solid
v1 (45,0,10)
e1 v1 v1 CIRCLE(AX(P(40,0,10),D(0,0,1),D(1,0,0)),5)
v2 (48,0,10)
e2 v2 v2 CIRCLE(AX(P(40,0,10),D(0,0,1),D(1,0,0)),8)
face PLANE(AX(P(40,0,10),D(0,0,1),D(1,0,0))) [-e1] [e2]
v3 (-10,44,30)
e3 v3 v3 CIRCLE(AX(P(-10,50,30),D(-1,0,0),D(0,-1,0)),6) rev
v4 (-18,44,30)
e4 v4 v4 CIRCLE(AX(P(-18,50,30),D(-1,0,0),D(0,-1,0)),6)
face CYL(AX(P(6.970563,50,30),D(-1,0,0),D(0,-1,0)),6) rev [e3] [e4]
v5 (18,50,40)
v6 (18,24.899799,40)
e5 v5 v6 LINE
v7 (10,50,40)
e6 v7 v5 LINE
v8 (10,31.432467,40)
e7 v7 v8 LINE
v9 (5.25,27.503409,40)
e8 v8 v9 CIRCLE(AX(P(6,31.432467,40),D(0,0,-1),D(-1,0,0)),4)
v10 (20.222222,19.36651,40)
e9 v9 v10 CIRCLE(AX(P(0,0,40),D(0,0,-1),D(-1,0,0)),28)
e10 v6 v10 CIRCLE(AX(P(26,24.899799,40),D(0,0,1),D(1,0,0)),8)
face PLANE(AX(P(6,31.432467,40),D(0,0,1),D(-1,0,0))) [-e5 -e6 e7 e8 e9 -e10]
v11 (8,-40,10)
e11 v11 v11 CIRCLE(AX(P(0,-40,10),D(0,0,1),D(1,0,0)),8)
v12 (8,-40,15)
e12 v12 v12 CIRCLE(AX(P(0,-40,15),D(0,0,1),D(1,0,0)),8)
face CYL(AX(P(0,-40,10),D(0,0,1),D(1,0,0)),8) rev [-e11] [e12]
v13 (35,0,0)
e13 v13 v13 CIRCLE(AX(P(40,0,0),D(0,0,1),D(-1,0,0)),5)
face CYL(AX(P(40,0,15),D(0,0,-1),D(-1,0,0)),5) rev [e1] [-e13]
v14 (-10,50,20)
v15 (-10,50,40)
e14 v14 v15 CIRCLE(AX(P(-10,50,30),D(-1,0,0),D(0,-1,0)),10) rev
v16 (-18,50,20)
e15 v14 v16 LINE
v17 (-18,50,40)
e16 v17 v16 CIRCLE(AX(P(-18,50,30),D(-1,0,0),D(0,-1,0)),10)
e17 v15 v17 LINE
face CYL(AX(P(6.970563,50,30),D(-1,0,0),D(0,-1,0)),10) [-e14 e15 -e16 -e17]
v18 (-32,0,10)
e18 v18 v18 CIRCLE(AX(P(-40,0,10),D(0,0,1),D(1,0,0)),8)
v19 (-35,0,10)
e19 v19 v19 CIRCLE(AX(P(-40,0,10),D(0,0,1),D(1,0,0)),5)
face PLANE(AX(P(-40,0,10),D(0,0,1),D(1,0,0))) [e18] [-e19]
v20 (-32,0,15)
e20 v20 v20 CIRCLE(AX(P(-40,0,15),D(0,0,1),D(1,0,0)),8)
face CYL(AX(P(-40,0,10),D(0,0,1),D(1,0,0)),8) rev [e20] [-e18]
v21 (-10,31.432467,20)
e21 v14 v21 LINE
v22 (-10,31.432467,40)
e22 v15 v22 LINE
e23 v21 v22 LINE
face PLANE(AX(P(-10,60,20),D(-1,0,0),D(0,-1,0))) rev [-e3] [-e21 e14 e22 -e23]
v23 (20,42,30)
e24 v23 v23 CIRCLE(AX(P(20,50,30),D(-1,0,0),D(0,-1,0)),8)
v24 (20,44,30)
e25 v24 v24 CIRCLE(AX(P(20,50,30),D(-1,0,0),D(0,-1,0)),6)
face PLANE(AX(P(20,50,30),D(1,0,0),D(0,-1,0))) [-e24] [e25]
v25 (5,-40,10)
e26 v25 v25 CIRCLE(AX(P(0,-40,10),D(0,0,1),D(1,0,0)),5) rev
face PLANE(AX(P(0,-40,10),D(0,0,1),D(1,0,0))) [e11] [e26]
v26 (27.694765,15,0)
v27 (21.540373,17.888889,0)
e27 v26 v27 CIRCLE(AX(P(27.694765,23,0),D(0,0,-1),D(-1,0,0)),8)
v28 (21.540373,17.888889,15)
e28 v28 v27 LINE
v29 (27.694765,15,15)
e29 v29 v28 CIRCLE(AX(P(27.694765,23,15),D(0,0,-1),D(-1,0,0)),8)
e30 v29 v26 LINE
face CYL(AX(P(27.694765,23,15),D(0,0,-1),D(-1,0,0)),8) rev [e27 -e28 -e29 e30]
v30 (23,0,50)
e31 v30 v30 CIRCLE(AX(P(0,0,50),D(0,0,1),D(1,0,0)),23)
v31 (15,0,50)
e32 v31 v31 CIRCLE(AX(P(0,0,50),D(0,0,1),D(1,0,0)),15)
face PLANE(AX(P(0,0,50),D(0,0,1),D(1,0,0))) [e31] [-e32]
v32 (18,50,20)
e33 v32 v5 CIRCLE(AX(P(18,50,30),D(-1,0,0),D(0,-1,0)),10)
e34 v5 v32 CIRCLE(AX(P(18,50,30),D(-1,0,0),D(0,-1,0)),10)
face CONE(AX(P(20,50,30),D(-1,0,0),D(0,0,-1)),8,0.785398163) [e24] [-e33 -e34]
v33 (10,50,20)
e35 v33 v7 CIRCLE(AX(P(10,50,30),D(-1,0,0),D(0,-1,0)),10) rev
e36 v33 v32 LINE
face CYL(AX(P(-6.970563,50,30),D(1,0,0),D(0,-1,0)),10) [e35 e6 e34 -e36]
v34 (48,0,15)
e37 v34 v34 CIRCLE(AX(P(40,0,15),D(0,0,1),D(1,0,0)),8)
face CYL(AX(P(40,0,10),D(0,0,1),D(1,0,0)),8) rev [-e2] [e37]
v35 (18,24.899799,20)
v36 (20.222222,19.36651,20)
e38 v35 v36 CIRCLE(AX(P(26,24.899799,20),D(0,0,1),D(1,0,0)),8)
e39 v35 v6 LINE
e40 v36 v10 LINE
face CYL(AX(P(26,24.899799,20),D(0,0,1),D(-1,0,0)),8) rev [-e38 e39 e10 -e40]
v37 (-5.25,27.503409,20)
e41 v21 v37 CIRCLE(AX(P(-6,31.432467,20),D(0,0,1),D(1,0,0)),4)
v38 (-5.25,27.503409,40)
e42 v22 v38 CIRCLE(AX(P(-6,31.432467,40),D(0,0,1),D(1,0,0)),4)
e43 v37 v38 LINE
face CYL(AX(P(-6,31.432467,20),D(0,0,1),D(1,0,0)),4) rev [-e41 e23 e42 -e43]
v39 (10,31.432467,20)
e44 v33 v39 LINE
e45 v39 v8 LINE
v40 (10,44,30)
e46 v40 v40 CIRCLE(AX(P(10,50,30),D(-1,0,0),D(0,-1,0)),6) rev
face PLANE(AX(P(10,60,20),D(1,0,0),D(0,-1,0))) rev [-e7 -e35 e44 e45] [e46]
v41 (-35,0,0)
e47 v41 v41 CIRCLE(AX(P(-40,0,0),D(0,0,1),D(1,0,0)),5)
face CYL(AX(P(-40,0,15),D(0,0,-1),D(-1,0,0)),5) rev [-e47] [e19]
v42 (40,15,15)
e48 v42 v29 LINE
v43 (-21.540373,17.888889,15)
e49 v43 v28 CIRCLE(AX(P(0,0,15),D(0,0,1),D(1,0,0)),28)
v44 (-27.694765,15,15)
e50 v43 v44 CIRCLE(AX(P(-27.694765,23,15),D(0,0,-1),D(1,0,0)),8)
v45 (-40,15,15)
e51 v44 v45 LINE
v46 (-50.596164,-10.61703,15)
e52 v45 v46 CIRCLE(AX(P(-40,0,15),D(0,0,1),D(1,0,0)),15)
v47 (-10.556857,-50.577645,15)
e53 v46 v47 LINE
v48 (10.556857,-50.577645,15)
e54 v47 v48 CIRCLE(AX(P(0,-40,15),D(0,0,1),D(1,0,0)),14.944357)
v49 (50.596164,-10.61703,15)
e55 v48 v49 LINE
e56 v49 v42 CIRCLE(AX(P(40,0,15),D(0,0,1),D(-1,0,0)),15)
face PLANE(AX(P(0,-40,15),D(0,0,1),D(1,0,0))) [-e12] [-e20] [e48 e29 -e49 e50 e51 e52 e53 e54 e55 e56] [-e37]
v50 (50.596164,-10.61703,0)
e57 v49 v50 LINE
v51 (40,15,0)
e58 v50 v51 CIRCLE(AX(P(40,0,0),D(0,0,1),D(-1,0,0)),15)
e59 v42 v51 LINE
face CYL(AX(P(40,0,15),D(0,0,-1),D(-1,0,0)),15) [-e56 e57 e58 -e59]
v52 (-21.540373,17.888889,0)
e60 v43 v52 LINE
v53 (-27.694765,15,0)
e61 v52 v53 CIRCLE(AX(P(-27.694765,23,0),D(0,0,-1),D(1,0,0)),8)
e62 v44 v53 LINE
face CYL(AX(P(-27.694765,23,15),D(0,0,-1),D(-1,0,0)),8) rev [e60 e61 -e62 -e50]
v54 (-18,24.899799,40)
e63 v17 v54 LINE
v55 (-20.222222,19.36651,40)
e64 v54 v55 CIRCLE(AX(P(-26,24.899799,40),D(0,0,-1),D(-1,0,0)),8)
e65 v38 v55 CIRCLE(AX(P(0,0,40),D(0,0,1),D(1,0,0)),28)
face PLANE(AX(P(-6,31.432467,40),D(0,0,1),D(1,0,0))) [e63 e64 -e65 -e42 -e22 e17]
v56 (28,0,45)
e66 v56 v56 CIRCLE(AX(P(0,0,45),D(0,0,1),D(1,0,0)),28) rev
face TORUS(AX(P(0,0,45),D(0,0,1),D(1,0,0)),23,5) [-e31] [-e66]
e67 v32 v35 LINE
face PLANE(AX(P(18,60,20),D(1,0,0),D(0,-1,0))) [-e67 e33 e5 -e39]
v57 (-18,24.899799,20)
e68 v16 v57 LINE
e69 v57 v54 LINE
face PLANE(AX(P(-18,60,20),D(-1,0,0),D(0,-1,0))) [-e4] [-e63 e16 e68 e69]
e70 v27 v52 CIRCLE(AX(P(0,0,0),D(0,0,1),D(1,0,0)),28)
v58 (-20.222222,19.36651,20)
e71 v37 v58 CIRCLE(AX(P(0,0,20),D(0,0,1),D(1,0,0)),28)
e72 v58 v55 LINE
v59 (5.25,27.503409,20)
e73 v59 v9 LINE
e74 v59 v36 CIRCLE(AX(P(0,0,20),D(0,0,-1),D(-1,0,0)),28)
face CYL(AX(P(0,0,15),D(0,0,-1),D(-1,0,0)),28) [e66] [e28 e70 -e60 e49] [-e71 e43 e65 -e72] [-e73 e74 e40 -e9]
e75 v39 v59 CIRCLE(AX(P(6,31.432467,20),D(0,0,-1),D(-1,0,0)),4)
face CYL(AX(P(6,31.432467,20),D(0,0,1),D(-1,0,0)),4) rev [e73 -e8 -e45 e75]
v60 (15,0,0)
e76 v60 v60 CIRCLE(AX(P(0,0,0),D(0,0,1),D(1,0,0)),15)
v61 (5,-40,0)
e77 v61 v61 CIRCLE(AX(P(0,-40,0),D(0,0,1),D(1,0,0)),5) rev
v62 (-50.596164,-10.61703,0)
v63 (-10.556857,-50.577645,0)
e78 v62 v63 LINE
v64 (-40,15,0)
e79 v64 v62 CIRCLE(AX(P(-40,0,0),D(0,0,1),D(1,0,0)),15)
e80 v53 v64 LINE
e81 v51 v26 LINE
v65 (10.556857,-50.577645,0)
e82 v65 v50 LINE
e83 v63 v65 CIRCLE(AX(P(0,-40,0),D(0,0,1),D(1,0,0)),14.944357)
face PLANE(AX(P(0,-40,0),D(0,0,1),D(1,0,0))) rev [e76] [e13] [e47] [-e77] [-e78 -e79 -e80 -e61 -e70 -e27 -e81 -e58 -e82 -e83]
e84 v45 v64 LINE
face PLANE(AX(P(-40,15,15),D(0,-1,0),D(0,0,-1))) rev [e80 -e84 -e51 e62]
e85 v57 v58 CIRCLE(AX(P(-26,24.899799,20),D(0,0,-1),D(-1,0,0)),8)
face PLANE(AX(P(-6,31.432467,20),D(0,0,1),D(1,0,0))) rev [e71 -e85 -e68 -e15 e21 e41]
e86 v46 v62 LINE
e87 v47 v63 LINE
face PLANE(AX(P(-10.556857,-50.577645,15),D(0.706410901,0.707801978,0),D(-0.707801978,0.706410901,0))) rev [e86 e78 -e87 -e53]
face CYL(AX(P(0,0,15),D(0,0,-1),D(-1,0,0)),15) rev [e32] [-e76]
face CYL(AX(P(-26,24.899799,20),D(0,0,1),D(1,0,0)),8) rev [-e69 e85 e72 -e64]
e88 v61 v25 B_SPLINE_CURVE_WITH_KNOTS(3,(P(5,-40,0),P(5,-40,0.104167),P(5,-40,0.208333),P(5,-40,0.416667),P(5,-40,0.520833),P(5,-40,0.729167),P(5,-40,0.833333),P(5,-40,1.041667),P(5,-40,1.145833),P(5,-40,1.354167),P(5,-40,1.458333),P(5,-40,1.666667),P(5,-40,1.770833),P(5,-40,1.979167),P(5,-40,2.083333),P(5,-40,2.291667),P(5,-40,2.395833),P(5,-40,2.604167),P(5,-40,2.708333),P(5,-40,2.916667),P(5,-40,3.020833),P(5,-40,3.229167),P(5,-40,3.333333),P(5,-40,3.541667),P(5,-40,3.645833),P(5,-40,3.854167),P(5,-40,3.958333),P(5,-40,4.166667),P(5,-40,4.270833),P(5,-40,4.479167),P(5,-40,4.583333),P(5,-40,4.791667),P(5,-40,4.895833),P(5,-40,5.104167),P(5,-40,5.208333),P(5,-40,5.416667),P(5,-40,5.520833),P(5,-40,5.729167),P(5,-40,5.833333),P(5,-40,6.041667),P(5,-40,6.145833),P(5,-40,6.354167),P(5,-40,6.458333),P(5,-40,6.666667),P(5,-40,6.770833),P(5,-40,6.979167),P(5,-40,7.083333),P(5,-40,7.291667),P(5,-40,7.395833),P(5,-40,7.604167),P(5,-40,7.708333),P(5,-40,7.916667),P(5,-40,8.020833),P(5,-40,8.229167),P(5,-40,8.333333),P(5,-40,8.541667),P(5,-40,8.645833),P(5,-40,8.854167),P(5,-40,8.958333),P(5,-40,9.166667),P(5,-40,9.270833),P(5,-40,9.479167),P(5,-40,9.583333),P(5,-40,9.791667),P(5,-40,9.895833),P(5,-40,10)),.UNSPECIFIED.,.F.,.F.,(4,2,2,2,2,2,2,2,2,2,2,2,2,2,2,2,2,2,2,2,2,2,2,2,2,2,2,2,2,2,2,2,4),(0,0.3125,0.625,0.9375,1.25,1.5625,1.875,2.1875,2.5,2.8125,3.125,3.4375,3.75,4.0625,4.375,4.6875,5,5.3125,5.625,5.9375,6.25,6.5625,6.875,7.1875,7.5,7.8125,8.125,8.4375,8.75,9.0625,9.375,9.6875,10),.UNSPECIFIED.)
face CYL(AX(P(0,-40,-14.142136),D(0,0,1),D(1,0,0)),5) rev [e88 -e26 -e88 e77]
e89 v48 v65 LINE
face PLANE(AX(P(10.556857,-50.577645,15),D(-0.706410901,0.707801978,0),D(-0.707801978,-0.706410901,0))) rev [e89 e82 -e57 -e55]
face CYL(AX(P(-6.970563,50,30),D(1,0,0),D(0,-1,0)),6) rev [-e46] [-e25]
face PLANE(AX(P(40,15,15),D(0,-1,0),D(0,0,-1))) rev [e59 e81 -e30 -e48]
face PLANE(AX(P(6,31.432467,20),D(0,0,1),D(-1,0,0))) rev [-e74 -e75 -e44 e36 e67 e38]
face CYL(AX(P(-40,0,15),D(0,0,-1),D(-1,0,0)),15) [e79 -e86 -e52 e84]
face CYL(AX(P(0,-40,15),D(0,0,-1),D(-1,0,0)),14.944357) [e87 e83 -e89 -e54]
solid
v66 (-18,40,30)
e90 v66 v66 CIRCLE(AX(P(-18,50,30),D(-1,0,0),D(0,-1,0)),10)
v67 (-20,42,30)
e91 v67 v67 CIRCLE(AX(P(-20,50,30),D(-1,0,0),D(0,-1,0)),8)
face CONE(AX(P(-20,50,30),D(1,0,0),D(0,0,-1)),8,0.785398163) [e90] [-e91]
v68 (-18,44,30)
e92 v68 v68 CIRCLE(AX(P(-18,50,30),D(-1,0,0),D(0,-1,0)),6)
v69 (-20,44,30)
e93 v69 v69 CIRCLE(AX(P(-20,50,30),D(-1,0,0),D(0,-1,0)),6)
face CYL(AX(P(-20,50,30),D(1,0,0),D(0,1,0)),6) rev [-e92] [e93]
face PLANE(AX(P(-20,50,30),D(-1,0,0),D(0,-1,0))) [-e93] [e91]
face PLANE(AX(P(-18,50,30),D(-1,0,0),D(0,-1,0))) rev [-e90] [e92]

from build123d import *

# Parameters (mm, degrees)
IZIM1_R                     = 15
IZIM1_R_2                   = 5
Y_KSEKLIK_EKSTR_ZYON1_DEPTH = 15
IZIM2_R                     = 28
IZIM2_R_2                   = 15
Y_KSEKLIK_EKSTR_ZYON2_DEPTH = 35
RADYUS1_R                   = 5
IZIM3_R                     = 5
KES_EKSTR_ZYON1_DEPTH       = 15
IZIM4_R                     = 8
KES_EKSTR_ZYON2_DEPTH       = 5
Y_KSEKLIK_EKSTR_ZYON3_START = -20
Y_KSEKLIK_EKSTR_ZYON3_DEPTH = 20
IZIM6_R                     = 6
KES_EKSTR_ZYON3_DEPTH       = 8
IZIM7_R                     = 10
IZIM7_R_2                   = 6
Y_KSEKLIK_EKSTR_ZYON4_DEPTH = 2
PAH1_SIZE                   = 2
PAH1_OF_AYNALAMA1_SIZE      = 2


with BuildPart() as part:
    # Çizim1 → Yükseklik-Ekstrüzyon1 (new body)
    with BuildSketch(Plane.XY):
        with BuildLine():
            Line((-10.556856631, -50.577645382), (-50.596163509, -10.617029664))
            ThreePointArc((-50.596163509, -10.617029664), (-53.861014482, 5.733435054), (-40, 15))
            Line((-40, 15), (-27.694764848, 15))
            ThreePointArc((-27.694764848, 15), (-24.295418506, 15.758146339), (-21.54037266, 17.888888889))
            ThreePointArc((-21.54037266, 17.888888889), (0, 28), (21.54037266, 17.888888889))
            ThreePointArc((21.54037266, 17.888888889), (24.295418506, 15.758146339), (27.694764848, 15))
            Line((27.694764848, 15), (40, 15))
            ThreePointArc((40, 15), (53.861014482, 5.733435054), (50.596163509, -10.617029664))
            Line((50.596163509, -10.617029664), (10.556856631, -50.577645382))
            ThreePointArc((10.556856631, -50.577645382), (0, -54.94435692), (-10.556856631, -50.577645382))
        make_face()
        Circle(IZIM1_R, mode=Mode.SUBTRACT)
        with Locations((-40, 0)):
            Circle(IZIM1_R_2, mode=Mode.SUBTRACT)
        with Locations(Location((40, 0, 0), (0, 0, 180))):
            Circle(IZIM1_R_2, mode=Mode.SUBTRACT)
    extrude(amount=Y_KSEKLIK_EKSTR_ZYON1_DEPTH)

    # Çizim2 → Yükseklik-Ekstrüzyon2 (add)
    with BuildSketch(Plane.XY.offset(15)):
        with Locations(Location((0, 0, 0), (0, 0, 140.290983447))):
            Circle(IZIM2_R)
        Circle(IZIM2_R_2, mode=Mode.SUBTRACT)
    extrude(amount=Y_KSEKLIK_EKSTR_ZYON2_DEPTH)

    # Radyus1
    radyus1_edges = [part.edges().sort_by_distance(p)[0] for p in [
        (21.54037266, -17.888888889, 50),
    ]]
    fillet(radyus1_edges, radius=RADYUS1_R)

    # Çizim3 → Kes-Ekstrüzyon1 (cut)
    with BuildSketch(Plane.XY.offset(15)):
        with Locations((0, -40)):
            Circle(IZIM3_R)
    extrude(amount=-KES_EKSTR_ZYON1_DEPTH, mode=Mode.SUBTRACT)

    # Çizim4 → Kes-Ekstrüzyon2 (cut)
    with BuildSketch(Plane.XY.offset(15)):
        with Locations((-40, 0)):
            Circle(IZIM4_R)
        with Locations((0, -40)):
            Circle(IZIM4_R)
        with Locations((40, 0)):
            Circle(IZIM4_R)
    extrude(amount=-KES_EKSTR_ZYON2_DEPTH, mode=Mode.SUBTRACT)

    # Çizim5 → Yükseklik-Ekstrüzyon3 (add)
    with BuildSketch(Plane.XY.offset(40).offset(Y_KSEKLIK_EKSTR_ZYON3_START)):
        with BuildLine():
            Line((-18, 60), (-18, 24.899799196))
            ThreePointArc((-18, 24.899799196), (-18.576314183, 21.918375226), (-20.222222222, 19.366510486))
            ThreePointArc((-20.222222222, 19.366510486), (-13.370146039, 24.6016096), (-5.25, 27.50340888))
            ThreePointArc((-5.25, 27.50340888), (-8.549509757, 28.35026029), (-10, 31.432467291))
            Line((-10, 31.432467291), (-10, 60))
            Line((-10, 60), (-18, 60))
        make_face()
    y_kseklik_ekstr_zyon3 = extrude(amount=Y_KSEKLIK_EKSTR_ZYON3_DEPTH)

    # Çizim6 → Kes-Ekstrüzyon3 (cut)
    with BuildSketch(Plane.ZY.offset(18)):
        with BuildLine():
            Line((40, 50), (40, 60))
            Line((40, 60), (30, 60))
            ThreePointArc((30, 60), (37.071067812, 57.071067812), (40, 50))
        make_face()
        with BuildLine():
            ThreePointArc((20, 50), (22.928932188, 57.071067812), (30, 60))
            Line((30, 60), (20, 60))
            Line((20, 60), (20, 50))
        make_face()
        with Locations(Location((30, 50, 0), (0, 0, 270))):
            Circle(IZIM6_R)
    kes_ekstr_zyon3 = extrude(amount=-KES_EKSTR_ZYON3_DEPTH, mode=Mode.SUBTRACT)


with BuildPart() as body_2:
    # Çizim7 → Yükseklik-Ekstrüzyon4 (new body)
    with BuildSketch(Plane.ZY.offset(18)):
        with Locations(Location((30, 50, 0), (0, 0, 270))):
            Circle(IZIM7_R)
        with Locations(Location((30, 50, 0), (0, 0, 270))):
            Circle(IZIM7_R_2, mode=Mode.SUBTRACT)
    y_kseklik_ekstr_zyon4 = extrude(amount=Y_KSEKLIK_EKSTR_ZYON4_DEPTH)

    # Pah1
    pah1_edges = [body_2.edges().sort_by_distance(p)[0] for p in [
        (-20, 60, 30),
    ]]
    chamfer(pah1_edges, length=PAH1_SIZE - 0.0001)  # a hair under: the kernel refuses the full size


with BuildPart() as part_1:
    add(part.part)

    # Aynalama1: Yükseklik-Ekstrüzyon3, Kes-Ekstrüzyon3, Yükseklik-Ekstrüzyon4 across plane
    add(y_kseklik_ekstr_zyon3.mirror(Plane(origin=(0, 0, 0), x_dir=(0, 0, 1), z_dir=(1, 0, 0))))
    add(kes_ekstr_zyon3.mirror(Plane(origin=(0, 0, 0), x_dir=(0, 0, 1), z_dir=(1, 0, 0))), mode=Mode.SUBTRACT)
    add(y_kseklik_ekstr_zyon4.mirror(Plane(origin=(0, 0, 0), x_dir=(0, 0, 1), z_dir=(1, 0, 0))))

    # Pah1 of Aynalama1
    pah1_of_aynalama1_edges = [part_1.edges().sort_by_distance(p)[0] for p in [
        (20, 60, 30),
    ]]
    chamfer(pah1_of_aynalama1_edges, length=PAH1_OF_AYNALAMA1_SIZE - 0.0001)  # a hair under: the kernel refuses the full size


solid = Compound([body_2.part, part_1.part])
